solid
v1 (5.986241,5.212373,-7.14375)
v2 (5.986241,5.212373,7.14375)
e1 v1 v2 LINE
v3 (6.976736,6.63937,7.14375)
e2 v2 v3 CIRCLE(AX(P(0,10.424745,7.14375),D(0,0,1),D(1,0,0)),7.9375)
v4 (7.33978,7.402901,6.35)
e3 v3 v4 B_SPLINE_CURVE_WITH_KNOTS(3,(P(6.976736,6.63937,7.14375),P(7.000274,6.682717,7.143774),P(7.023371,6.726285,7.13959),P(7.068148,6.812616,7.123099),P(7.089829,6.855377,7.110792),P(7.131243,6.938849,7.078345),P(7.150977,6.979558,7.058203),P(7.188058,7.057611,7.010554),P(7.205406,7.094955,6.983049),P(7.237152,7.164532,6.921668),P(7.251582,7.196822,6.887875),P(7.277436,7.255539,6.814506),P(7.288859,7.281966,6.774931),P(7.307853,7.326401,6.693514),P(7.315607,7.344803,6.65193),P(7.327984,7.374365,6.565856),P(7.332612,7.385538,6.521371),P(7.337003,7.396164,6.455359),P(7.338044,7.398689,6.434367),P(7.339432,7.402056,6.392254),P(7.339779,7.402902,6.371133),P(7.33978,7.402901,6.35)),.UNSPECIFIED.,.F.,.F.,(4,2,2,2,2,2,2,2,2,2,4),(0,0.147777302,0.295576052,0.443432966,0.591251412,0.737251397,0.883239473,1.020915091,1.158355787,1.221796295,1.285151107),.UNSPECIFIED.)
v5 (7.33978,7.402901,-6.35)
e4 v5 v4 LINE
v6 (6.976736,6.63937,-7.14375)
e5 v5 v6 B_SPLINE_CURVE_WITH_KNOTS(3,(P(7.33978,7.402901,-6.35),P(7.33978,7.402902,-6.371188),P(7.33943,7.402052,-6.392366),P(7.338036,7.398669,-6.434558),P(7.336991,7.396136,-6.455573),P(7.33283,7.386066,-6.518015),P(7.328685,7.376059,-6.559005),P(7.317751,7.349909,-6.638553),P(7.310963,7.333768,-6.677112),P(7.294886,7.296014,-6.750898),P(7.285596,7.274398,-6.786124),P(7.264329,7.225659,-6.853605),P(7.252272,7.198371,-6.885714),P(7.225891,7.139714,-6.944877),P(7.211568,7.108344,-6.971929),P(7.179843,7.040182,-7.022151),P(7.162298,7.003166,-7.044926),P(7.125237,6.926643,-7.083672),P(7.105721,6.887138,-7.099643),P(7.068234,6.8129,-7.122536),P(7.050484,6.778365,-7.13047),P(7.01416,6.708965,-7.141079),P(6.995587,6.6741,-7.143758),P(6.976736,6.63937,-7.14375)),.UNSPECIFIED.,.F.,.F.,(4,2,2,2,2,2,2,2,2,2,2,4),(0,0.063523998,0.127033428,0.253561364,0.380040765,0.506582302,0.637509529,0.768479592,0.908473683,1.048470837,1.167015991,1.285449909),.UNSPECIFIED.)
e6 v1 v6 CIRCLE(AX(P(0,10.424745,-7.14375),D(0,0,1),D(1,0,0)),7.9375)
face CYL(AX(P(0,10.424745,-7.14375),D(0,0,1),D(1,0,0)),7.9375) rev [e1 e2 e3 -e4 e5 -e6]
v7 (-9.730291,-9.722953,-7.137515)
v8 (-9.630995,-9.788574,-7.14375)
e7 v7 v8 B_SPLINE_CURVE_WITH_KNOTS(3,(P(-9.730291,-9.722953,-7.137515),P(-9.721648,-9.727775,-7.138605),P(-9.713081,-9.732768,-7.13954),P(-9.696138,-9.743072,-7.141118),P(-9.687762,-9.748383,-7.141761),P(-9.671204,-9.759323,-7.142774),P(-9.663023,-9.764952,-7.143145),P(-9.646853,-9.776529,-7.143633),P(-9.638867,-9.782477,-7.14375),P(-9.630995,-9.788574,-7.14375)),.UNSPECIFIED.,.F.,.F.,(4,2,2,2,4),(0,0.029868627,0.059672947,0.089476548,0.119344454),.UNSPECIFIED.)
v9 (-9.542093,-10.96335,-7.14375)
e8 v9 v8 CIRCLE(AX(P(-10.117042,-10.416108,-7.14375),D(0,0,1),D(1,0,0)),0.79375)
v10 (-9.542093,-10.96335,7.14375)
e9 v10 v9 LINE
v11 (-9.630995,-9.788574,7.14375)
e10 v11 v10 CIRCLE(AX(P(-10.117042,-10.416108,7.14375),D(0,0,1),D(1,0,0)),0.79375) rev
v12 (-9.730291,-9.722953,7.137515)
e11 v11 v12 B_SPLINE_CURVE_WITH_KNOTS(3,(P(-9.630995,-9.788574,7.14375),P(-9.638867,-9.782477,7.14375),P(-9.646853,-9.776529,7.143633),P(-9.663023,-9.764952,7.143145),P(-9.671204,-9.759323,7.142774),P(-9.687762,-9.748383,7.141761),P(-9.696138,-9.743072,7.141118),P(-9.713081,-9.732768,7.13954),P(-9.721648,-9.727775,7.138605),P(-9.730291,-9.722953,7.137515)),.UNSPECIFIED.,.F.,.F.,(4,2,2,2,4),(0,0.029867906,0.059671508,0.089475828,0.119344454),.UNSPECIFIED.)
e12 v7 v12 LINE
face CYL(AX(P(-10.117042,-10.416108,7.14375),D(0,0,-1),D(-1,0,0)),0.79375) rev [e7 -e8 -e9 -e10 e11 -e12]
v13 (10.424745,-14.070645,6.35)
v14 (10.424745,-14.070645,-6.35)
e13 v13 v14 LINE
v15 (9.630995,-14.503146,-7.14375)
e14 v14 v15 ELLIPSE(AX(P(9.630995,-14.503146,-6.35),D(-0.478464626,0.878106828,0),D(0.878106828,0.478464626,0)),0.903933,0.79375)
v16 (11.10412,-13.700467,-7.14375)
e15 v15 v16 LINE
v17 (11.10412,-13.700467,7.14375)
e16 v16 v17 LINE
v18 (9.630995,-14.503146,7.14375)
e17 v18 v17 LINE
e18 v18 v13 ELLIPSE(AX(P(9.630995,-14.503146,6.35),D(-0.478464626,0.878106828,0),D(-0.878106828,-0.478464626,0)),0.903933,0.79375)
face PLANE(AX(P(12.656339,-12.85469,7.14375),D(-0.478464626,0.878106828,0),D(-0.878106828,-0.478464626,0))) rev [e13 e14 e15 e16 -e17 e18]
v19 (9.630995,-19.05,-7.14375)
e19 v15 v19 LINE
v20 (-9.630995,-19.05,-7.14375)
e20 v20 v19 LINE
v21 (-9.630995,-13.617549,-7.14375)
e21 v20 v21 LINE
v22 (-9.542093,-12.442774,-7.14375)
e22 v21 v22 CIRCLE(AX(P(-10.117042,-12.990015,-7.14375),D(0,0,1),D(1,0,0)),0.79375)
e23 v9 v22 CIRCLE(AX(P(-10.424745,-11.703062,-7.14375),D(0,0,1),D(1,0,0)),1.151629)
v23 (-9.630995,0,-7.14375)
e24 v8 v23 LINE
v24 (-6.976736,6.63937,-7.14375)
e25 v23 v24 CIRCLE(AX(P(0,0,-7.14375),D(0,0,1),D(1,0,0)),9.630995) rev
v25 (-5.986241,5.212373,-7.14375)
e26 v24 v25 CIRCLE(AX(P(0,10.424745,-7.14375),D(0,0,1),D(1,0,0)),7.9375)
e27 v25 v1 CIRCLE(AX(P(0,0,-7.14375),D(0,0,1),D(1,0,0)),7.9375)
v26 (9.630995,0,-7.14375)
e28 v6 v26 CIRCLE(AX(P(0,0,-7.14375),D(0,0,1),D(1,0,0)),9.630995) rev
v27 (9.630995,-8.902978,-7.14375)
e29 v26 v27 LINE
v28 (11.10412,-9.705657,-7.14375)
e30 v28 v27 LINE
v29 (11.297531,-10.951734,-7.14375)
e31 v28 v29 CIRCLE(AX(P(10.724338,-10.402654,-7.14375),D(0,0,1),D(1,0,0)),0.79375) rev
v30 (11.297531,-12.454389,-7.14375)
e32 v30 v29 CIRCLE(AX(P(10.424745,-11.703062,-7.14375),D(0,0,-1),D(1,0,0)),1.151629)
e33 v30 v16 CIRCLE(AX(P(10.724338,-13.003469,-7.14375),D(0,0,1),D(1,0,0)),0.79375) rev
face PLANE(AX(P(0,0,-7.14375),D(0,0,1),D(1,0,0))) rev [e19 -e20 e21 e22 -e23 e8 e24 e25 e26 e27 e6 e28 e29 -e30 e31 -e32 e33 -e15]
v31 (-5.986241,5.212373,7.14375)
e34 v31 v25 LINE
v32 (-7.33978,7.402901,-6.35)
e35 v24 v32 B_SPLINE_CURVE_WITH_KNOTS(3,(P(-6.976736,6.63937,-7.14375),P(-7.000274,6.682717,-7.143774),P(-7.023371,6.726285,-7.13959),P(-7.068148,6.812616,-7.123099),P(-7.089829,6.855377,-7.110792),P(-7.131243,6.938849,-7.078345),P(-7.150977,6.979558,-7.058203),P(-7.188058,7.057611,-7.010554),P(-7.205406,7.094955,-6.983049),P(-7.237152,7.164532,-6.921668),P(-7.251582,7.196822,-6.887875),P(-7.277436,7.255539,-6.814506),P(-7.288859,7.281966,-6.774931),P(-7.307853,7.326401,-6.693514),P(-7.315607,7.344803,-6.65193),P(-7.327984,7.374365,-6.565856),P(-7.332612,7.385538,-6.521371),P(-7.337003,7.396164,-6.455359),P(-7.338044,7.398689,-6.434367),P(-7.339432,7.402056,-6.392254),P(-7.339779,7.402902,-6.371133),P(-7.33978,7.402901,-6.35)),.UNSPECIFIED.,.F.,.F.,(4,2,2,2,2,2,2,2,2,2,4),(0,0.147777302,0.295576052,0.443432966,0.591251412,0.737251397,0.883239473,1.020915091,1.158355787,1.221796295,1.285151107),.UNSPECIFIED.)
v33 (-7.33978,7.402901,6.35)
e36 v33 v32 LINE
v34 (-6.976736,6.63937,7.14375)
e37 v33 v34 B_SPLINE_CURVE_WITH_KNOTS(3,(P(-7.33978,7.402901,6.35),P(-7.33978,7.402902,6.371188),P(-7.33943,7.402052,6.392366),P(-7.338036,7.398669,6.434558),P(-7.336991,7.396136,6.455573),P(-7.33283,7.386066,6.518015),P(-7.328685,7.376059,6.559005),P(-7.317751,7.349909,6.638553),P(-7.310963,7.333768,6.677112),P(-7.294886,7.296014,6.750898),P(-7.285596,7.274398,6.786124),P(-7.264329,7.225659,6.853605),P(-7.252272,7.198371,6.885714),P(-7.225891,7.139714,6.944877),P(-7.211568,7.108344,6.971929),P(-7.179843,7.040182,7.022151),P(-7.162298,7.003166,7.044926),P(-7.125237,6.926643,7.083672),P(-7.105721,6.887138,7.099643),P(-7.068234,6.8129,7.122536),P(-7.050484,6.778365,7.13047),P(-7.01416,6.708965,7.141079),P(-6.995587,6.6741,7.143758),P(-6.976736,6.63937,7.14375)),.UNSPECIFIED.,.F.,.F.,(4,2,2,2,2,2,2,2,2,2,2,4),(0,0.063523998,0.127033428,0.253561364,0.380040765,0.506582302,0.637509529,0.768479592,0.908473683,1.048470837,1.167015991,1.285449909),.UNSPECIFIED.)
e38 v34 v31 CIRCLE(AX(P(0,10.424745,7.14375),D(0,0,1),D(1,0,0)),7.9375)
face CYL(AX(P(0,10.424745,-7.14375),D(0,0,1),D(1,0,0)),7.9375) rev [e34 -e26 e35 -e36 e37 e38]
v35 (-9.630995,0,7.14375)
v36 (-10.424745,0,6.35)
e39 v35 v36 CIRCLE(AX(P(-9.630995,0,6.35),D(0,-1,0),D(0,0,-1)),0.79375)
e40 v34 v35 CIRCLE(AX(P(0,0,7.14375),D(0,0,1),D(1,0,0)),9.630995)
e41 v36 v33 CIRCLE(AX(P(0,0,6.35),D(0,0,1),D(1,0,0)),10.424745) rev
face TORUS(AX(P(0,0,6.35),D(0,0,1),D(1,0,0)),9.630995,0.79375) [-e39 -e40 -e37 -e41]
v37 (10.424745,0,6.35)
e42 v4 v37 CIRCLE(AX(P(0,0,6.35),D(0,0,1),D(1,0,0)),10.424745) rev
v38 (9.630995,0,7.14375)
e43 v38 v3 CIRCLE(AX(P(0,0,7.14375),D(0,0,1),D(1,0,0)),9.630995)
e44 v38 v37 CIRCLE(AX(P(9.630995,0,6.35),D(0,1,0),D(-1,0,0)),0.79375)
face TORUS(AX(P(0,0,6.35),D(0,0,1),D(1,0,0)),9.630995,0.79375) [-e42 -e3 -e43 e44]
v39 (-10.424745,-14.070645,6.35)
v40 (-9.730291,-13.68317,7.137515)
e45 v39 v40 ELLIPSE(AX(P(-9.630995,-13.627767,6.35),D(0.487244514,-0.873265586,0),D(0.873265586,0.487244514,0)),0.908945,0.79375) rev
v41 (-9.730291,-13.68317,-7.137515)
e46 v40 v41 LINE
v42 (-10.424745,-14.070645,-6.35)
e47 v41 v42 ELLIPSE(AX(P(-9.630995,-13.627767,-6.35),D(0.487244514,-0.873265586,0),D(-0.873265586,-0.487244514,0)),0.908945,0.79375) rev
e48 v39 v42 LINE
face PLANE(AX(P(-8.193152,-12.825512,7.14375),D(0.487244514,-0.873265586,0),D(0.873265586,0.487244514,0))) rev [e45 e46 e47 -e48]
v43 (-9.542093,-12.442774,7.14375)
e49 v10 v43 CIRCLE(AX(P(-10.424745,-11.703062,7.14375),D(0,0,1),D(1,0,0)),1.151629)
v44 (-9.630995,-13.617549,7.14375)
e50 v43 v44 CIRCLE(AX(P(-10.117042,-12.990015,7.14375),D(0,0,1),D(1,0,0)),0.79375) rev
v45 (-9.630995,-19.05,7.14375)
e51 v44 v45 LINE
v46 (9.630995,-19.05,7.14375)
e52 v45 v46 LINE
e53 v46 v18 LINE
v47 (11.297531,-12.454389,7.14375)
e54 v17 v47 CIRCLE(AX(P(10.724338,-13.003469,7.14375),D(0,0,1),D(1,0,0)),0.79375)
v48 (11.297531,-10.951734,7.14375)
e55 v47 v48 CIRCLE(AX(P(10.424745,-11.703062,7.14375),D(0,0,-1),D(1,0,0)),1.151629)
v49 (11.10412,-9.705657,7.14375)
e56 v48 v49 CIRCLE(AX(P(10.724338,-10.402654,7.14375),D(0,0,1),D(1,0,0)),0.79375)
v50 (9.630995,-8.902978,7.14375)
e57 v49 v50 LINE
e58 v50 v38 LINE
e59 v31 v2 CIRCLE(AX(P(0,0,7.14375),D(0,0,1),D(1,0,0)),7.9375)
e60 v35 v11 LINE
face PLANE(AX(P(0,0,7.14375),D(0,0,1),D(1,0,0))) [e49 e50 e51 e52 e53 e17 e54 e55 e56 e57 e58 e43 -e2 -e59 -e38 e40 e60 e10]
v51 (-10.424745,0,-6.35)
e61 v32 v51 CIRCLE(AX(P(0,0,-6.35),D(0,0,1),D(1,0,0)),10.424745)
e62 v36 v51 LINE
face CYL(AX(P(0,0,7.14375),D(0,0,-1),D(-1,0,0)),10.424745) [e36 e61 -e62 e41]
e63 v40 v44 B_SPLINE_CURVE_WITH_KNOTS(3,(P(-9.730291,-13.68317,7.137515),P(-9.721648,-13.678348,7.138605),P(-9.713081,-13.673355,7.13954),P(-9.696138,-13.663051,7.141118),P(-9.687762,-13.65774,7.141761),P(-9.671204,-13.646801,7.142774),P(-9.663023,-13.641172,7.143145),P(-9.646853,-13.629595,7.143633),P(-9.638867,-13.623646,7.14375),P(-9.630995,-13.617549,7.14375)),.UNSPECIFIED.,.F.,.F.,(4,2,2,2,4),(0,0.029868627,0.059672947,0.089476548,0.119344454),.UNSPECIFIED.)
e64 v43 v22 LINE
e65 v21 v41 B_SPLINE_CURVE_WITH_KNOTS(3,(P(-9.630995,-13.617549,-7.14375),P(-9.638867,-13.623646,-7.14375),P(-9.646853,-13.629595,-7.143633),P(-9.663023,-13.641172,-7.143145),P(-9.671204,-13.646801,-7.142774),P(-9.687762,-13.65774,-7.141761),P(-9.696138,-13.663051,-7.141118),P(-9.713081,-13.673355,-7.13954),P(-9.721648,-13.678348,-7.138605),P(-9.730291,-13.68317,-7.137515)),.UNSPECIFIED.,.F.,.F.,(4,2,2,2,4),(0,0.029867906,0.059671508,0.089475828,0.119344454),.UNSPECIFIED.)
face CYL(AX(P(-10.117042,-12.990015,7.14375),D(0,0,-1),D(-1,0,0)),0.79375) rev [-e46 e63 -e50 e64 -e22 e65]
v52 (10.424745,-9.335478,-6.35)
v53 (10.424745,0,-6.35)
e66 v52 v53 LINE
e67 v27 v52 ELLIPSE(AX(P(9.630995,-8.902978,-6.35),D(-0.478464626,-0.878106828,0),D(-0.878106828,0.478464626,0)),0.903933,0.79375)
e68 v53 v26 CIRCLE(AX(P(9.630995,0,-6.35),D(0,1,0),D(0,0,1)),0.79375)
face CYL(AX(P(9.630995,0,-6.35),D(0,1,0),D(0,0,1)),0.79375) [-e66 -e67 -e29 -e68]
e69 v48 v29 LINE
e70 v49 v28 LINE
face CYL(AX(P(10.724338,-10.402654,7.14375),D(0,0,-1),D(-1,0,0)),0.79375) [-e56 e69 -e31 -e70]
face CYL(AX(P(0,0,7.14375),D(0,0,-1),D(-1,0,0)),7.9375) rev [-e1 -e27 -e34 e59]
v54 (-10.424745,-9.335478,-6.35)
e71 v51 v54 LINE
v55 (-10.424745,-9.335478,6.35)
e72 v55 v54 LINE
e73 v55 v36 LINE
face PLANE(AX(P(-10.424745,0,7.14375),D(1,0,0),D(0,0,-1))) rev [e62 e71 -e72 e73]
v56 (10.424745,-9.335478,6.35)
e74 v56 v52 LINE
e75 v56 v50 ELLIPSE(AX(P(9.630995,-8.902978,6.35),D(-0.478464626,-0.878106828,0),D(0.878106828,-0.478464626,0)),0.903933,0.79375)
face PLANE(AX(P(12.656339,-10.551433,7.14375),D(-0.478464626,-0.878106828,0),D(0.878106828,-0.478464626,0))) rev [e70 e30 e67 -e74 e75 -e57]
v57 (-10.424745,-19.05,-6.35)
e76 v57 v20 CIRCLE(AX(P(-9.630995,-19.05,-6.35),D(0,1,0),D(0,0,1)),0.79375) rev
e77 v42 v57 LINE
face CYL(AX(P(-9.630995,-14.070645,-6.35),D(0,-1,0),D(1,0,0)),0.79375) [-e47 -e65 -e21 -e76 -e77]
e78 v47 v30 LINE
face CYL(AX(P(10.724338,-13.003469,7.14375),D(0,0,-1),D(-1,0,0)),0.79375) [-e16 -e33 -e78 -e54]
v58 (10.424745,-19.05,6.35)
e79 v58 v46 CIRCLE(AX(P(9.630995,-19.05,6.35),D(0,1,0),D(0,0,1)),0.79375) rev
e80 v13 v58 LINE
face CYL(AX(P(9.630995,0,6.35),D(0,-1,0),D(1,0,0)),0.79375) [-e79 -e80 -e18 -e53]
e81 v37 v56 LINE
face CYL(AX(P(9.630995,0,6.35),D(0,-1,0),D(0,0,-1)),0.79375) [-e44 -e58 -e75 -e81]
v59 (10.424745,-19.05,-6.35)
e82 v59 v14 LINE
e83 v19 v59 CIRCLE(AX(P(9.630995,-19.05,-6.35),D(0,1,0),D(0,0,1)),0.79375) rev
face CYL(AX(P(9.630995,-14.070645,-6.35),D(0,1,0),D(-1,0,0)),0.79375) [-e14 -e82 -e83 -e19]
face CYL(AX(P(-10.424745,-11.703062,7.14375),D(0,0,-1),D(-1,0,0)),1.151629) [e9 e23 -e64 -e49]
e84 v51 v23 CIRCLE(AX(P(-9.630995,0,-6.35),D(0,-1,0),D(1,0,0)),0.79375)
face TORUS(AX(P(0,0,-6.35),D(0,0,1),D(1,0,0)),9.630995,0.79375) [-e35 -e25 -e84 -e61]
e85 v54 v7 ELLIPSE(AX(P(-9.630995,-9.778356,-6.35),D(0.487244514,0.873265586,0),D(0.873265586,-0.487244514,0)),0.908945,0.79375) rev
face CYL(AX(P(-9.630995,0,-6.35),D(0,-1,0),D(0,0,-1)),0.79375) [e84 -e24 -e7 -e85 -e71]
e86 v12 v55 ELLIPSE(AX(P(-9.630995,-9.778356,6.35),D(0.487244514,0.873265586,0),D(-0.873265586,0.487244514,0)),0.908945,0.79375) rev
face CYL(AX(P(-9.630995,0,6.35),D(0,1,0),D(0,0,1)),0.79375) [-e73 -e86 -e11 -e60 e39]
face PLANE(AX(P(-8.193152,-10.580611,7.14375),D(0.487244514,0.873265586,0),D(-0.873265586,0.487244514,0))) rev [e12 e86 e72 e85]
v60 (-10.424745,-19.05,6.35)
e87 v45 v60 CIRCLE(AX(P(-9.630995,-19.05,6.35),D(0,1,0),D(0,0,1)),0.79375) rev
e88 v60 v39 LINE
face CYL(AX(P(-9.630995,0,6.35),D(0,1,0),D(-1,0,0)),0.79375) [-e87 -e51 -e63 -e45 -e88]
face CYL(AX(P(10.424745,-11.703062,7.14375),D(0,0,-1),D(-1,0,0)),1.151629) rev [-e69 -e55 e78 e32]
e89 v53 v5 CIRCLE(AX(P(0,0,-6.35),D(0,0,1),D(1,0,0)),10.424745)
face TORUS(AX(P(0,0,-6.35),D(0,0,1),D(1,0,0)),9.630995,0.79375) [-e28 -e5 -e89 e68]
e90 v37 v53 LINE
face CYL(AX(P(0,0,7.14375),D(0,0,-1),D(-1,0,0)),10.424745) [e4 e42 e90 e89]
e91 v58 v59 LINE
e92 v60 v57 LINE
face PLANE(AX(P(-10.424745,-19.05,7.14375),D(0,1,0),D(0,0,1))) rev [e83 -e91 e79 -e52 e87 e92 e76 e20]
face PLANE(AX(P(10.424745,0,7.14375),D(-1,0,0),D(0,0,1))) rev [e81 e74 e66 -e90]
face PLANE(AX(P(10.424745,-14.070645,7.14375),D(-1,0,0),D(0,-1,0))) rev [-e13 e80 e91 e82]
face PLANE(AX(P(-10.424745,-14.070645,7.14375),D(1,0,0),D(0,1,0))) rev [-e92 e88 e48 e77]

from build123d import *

# Parameters (mm, degrees)
SKETCH1_R            = 7.9375
BOSS_EXTRUDE19_DEPTH = 7.14375
SKETCH2_R            = 7.9375
CUT_EXTRUDE2_DEPTH   = 27.966981115
FILLET6_R            = 0.79375
FILLET7_R            = 0.79375


with BuildPart() as part:
    # Sketch1 → Boss-Extrude19 (new, symmetric)
    with BuildSketch(Plane.XY):
        with BuildLine():
            Line((-10.424745199, -14.070645408), (-10.424745199, -19.05))
            Line((-10.424745199, -19.05), (10.424745199, -19.05))
            Line((10.424745199, -19.05), (10.424745199, -14.070645408))
            Line((10.424745199, -14.070645408), (12.656338894, -12.854690118))
            Line((12.656338894, -12.854690118), (11.297531111, -12.4543891))
            ThreePointArc((11.297531111, -12.4543891), (9.273116661, -11.703061579), (11.297531111, -10.951734059))
            Line((11.297531111, -10.951734059), (12.656338894, -10.551433041))
            Line((12.656338894, -10.551433041), (10.424745199, -9.33547775))
            Line((10.424745199, -9.33547775), (10.424745199, 0))
            ThreePointArc((10.424745199, 0), (0, 10.424745199), (-10.424745199, 0))
            Line((-10.424745199, 0), (-10.424745199, -9.33547775))
            Line((-10.424745199, -9.33547775), (-8.193151504, -10.580610736))
            Line((-8.193151504, -10.580610736), (-9.542093319, -10.963349508))
            ThreePointArc((-9.542093319, -10.963349508), (-11.576373738, -11.703061579), (-9.542093319, -12.442773651))
            Line((-9.542093319, -12.442773651), (-8.193151504, -12.825512422))
            Line((-8.193151504, -12.825512422), (-10.424745199, -14.070645408))
        make_face()
        Circle(SKETCH1_R, mode=Mode.SUBTRACT)
    extrude(amount=BOSS_EXTRUDE19_DEPTH, both=True)

    # Sketch2 → Cut-Extrude2 (cut, through all)
    with BuildSketch(Plane.XY.offset(7.14375)):
        with Locations((0, 10.424745199)):
            Circle(SKETCH2_R)
    extrude(amount=-CUT_EXTRUDE2_DEPTH, mode=Mode.SUBTRACT)

    # Fillet6
    # the kernel refuses this fillet: 0.79375 mm, written as the material it adds along each edge
    with BuildSketch(Plane(origin=(-8.193151504, -12.825512422, -7.14375), x_dir=(-0.8732655856931067, -0.4872445144319999, 0), z_dir=(0, 0, 1))) as fillet6_piece_1:
        with BuildLine():
            CenterArc((1.76022016, -0.79375), FILLET6_R, 90, 104.42604794)
            Line((0.991497097, -0.991497097), (0.976122636, -0.995452039))
            ThreePointArc((0.976122636, -0.995452039), (0.484523228, -0.506973869), (-0.01122532, -0.01122532))
            Line((-0.01122532, -0.01122532), (0, 0.015875))
            Line((0, 0.015875), (1.76022016, 0.015875))
            Line((1.76022016, 0.015875), (1.76022016, 0))
        make_face()
    extrude(amount=14.2875)
    with BuildSketch(Plane(origin=(-8.193151504, -10.580610736, -7.14375), x_dir=(-0.962025917671251, -0.2729581171696266, 0), z_dir=(0, 0, 1))) as fillet6_piece_2:
        with BuildLine():
            CenterArc((1.805929619, -0.683397604), FILLET6_R, 120.57395206, 104.42604794)
            Line((1.244663612, -1.244663612), (1.233438292, -1.255888932))
            Line((1.233438292, -1.255888932), (-0.01122532, -0.01122532))
            Line((-0.01122532, -0.01122532), (0, 0.015875))
            ThreePointArc((0, 0.015875), (0.701094321, 0.015875), (1.394113822, 0.013667952))
            Line((1.394113822, 0.013667952), (1.402188642, 0))
        make_face()
    extrude(amount=14.2875)
    # the kernel refuses this fillet: 0.79375 mm, written as the material it takes off along each edge
    with BuildSketch(Plane(origin=(12.656338894, -12.854690118, -11.562971269), x_dir=(-0.9592408744906186, 0.28258971089987234, 0), z_dir=(0, 0, 1))) as fillet6_2_piece_1:
        with BuildLine():
            CenterArc((1.811210538, 0.688678523), FILLET6_R, 135, 105.183982463)
            Line((1.249944531, 1.249944531), (1.238719211, 1.261169851))
            Line((1.238719211, 1.261169851), (-0.01122532, 0.01122532))
            Line((-0.01122532, 0.01122532), (0, -0.015875))
            ThreePointArc((0, -0.015875), (0.708272458, -0.015875), (1.408651603, -0.01377357))
            Line((1.408651603, -0.01377357), (1.416544915, 0))
        make_face()
    extrude(amount=23.125942539, mode=Mode.SUBTRACT)
    with BuildSketch(Plane(origin=(12.656338894, -10.551433041, -11.562971269), x_dir=(-0.8781068280147701, 0.4784646262722449, 0), z_dir=(0, 0, 1))) as fillet6_2_piece_2:
        with BuildLine():
            CenterArc((1.767688508, 0.79375), FILLET6_R, 164.816017537, 105.183982463)
            Line((1.001648515, 1.001648515), (0.986327716, 1.005806486))
            ThreePointArc((0.986327716, 1.005806486), (0.489598938, 0.512049578), (-0.01122532, 0.01122532))
            Line((-0.01122532, 0.01122532), (0, -0.015875))
            Line((0, -0.015875), (1.767688508, -0.015875))
            Line((1.767688508, -0.015875), (1.767688508, 0))
        make_face()
    extrude(amount=23.125942539, mode=Mode.SUBTRACT)

    # Fillet7
    fillet7_edges = [part.edges().sort_by_distance(p)[0] for p in [
        (-10.424745199, -16.560322704, -7.14375),
        (-10.424745199, -4.667738875, -7.14375),
        (-9.622646342, 4.009986266, -7.14375),
        (9.622646342, 4.009986266, -7.14375),
        (10.424745199, -4.667738875, -7.14375),
        (10.424745199, -16.560322704, -7.14375),
        (10.424745199, -16.560322704, 7.14375),
        (-10.424745199, -16.560322704, 7.14375),
        (-10.424745199, -4.667738875, 7.14375),
        (-9.622646342, 4.009986266, 7.14375),
        (9.622646342, 4.009986266, 7.14375),
        (10.424745199, -4.667738875, 7.14375),
    ]]
    fillet(fillet7_edges, radius=FILLET7_R)


solid = part.part
